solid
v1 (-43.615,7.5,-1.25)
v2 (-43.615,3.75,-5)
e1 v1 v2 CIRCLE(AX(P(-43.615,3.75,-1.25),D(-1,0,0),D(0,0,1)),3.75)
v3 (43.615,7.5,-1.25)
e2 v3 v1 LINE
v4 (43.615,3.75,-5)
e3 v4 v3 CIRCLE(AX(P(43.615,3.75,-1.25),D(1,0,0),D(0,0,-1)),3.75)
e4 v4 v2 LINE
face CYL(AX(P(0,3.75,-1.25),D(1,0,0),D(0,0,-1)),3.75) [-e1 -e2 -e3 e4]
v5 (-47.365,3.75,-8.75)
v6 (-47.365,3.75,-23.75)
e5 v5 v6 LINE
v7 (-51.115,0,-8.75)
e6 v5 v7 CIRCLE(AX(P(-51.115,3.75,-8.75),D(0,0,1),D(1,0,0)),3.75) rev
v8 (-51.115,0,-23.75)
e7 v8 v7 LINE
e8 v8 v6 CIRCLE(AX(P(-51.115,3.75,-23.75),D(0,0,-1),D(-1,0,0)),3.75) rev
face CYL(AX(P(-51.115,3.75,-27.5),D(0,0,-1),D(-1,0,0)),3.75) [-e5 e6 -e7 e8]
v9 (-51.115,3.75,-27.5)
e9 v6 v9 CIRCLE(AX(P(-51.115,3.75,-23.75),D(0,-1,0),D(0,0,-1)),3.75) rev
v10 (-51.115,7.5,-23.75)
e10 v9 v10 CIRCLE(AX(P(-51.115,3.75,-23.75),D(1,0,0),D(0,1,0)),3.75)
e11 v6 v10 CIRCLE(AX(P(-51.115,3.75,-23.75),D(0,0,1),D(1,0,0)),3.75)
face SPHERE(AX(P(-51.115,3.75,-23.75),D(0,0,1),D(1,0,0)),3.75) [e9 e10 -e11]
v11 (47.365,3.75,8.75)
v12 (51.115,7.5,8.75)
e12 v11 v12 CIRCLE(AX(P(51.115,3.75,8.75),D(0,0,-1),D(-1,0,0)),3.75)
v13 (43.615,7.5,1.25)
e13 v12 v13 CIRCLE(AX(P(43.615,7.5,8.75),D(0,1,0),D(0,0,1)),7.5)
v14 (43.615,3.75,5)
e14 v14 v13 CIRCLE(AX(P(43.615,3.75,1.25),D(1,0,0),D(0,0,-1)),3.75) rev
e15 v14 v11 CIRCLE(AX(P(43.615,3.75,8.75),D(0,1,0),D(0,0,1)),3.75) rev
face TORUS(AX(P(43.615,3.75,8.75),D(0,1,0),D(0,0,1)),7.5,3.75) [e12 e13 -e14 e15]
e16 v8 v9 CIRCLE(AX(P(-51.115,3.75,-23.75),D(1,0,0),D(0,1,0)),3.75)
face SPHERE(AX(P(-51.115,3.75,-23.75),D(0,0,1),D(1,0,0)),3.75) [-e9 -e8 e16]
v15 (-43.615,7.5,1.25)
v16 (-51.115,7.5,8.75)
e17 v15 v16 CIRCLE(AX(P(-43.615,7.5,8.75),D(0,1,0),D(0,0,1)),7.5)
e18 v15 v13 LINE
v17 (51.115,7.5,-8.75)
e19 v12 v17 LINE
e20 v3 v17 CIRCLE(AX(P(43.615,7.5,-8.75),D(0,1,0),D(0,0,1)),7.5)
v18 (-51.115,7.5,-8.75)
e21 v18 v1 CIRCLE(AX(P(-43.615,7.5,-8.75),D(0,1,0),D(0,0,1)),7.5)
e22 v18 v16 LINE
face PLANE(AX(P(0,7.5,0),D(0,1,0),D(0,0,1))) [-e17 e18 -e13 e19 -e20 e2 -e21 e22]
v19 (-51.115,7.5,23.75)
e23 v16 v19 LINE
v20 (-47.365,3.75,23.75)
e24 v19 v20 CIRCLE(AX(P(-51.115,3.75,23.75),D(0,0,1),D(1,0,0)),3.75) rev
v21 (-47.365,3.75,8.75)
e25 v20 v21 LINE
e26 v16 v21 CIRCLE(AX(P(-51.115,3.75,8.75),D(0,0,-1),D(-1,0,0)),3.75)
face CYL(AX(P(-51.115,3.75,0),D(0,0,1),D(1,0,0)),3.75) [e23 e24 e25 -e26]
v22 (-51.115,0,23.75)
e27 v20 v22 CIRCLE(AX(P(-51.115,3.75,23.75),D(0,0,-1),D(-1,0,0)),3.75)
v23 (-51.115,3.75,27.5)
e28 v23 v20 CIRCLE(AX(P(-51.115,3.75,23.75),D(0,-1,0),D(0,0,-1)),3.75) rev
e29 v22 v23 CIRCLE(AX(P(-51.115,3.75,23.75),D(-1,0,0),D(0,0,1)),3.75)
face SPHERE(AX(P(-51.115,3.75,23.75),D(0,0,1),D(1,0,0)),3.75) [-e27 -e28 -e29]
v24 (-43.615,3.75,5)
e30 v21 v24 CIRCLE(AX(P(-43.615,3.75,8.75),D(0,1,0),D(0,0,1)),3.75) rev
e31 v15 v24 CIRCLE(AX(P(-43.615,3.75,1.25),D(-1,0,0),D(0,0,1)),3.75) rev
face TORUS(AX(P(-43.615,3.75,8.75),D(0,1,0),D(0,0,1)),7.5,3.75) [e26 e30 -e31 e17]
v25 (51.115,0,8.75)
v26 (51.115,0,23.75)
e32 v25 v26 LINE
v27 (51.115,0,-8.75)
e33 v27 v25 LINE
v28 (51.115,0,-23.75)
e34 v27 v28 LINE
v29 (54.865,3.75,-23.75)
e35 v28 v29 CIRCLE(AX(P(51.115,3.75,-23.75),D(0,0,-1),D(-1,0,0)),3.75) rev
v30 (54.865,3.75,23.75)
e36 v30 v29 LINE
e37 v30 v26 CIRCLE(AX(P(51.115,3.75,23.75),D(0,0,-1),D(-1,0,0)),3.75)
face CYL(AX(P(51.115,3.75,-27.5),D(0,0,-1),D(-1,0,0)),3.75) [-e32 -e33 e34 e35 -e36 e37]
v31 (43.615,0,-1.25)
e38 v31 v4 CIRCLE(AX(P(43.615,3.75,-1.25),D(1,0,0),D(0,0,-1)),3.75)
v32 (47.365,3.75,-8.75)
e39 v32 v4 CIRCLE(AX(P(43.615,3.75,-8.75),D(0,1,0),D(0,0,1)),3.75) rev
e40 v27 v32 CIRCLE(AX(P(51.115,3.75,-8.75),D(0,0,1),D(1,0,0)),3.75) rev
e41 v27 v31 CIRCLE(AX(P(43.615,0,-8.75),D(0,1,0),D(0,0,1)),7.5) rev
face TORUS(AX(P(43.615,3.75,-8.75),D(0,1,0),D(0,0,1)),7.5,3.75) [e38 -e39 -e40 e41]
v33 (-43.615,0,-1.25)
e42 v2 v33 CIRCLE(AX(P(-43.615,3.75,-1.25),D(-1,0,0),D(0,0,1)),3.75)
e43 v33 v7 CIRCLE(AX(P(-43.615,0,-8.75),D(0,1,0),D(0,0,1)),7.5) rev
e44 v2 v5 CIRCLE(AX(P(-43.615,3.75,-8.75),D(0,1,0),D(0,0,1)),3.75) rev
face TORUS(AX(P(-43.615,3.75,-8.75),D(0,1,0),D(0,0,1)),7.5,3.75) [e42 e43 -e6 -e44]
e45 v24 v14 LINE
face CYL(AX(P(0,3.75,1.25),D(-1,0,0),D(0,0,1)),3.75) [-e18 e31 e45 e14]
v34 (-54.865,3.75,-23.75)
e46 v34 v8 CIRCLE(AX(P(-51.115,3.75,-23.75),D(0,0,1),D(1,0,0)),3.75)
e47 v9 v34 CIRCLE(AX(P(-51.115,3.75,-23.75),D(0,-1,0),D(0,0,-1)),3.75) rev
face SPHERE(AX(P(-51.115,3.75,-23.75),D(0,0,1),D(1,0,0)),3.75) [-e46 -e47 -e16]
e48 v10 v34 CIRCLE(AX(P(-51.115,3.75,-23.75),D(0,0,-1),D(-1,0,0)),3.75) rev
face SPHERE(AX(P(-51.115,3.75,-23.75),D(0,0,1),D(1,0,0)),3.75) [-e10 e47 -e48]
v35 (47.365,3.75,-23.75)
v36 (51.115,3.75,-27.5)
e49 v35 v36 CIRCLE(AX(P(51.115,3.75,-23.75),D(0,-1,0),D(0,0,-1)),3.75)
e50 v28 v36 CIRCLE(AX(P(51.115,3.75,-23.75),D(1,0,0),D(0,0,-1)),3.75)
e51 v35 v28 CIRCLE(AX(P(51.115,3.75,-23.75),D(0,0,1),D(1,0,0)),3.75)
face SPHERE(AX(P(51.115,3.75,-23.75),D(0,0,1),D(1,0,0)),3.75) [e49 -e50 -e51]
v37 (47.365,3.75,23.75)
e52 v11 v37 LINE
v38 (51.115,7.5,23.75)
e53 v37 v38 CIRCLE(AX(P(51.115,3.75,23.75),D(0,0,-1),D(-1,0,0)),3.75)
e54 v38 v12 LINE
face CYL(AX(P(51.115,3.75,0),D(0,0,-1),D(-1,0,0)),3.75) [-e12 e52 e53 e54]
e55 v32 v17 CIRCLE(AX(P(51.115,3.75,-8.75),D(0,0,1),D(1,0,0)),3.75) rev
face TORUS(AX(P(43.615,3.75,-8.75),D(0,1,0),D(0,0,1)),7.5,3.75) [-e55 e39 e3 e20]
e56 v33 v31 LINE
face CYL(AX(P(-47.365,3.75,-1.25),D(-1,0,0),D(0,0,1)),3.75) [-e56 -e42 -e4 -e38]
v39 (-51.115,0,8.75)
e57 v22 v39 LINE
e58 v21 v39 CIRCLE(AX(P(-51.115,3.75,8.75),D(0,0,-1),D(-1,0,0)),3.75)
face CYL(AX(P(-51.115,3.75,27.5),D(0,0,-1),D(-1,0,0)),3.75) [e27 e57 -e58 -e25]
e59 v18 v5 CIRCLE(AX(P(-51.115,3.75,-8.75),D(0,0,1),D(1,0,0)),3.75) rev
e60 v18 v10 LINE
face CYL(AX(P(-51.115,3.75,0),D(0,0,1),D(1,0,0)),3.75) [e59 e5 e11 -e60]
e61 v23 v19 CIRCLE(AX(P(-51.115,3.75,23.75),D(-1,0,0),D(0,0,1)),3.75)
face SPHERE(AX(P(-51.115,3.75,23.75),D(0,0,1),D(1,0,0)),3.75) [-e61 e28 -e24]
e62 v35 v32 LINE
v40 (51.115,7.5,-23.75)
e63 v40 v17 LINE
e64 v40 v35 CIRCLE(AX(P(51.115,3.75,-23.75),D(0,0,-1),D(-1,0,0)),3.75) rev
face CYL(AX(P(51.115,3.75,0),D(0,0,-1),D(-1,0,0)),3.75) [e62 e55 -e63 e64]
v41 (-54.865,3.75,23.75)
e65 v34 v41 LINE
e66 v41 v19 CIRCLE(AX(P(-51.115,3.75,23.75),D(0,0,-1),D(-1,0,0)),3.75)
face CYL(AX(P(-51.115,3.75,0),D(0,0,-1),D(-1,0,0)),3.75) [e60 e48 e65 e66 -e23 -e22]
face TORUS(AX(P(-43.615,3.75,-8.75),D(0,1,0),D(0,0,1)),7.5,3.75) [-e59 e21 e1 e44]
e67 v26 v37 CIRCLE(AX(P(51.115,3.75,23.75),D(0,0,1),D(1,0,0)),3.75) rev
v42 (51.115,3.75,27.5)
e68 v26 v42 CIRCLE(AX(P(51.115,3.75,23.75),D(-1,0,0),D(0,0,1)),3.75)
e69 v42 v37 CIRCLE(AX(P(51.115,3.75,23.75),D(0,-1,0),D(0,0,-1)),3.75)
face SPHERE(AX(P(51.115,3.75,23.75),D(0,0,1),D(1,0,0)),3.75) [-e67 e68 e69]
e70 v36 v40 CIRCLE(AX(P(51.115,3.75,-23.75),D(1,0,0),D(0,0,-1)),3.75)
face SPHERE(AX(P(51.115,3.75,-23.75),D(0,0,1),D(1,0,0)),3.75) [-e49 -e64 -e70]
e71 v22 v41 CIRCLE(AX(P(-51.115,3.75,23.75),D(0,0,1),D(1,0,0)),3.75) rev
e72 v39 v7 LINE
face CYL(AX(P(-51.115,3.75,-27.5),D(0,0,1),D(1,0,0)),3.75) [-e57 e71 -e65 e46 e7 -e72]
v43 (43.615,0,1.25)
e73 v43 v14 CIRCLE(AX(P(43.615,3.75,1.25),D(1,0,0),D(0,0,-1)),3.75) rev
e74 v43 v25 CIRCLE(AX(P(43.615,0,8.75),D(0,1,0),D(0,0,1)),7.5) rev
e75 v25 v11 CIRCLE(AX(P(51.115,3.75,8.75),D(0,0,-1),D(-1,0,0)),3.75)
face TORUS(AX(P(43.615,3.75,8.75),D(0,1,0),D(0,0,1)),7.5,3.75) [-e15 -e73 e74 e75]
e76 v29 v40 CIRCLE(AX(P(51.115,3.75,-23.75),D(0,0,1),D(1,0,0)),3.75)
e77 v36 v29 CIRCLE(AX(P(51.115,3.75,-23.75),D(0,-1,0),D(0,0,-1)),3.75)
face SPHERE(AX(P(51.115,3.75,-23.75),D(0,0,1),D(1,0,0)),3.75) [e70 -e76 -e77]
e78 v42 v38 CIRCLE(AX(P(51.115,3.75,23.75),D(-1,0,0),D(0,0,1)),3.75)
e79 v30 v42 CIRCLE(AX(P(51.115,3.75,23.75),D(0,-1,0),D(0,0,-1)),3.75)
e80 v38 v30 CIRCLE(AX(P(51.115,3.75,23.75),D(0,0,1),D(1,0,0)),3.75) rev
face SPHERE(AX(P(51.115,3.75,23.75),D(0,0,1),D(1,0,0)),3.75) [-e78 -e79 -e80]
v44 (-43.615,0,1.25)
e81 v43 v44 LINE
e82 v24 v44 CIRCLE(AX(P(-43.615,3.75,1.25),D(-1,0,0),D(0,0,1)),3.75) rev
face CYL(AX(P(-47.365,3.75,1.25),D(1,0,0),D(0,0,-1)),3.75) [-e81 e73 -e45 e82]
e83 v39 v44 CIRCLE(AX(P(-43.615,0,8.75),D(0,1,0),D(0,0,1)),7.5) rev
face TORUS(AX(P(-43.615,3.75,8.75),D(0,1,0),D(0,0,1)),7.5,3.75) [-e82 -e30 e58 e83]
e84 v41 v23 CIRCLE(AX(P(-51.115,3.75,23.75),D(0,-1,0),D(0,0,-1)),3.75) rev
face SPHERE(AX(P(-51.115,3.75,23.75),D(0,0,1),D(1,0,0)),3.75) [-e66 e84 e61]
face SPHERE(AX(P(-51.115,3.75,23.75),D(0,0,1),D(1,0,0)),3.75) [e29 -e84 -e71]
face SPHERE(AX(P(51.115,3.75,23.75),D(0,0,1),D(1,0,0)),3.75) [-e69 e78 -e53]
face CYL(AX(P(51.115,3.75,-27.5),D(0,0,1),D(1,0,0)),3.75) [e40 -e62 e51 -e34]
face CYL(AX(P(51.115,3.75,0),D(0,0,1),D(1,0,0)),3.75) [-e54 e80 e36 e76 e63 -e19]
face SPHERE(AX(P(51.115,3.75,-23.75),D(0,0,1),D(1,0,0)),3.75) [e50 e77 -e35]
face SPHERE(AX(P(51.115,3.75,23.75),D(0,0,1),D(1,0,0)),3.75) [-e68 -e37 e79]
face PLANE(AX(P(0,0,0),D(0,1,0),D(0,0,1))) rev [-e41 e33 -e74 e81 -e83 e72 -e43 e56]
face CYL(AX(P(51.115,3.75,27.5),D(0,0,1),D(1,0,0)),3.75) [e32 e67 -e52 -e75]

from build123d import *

# Parameters (mm, degrees)
BOSS_EXTRUDE1_DEPTH = 7.5
FILLET1_R           = 3.75
FILLET2_R           = 3.75


# Some blends are built 0.0001 mm under size
with BuildPart() as part:
    # Sketch2 → Boss-Extrude1 (new body)
    with BuildSketch(Plane(origin=(0, 0, 0), x_dir=(1, 0, 0), z_dir=(0, 1, 0))):
        Polygon((-54.865, 27.5), (-54.865, -27.5), (-47.365, -27.5), (-47.365, -5), (47.365, -5), (47.365, -27.5), (54.865, -27.5), (54.865, 27.5), (47.365, 27.5), (47.365, 5), (-47.365, 5), (-47.365, 27.5), align=None)
    extrude(amount=BOSS_EXTRUDE1_DEPTH)

    # Fillet1
    fillet1_edges = [part.edges().sort_by_distance(p)[0] for p in [
        (0, 7.5, 5),
        (-54.865, 0, 0),
        (-47.365, 0, -16.25),
        (0, 0, -5),
        (47.365, 0, -16.25),
        (47.365, 7.5, 16.25),
        (54.865, 0, 0),
        (47.365, 0, 16.25),
        (0, 0, 5),
        (-47.365, 0, 16.25),
        (54.865, 7.5, 0),
        (-54.865, 3.75, 27.5),
        (-54.865, 3.75, -27.5),
        (-47.365, 3.75, -27.5),
        (-47.365, 3.75, -5),
        (47.365, 3.75, -5),
        (47.365, 3.75, -27.5),
        (54.865, 3.75, -27.5),
        (54.865, 3.75, 27.5),
        (47.365, 3.75, 27.5),
        (47.365, 3.75, 5),
        (-47.365, 3.75, 5),
        (-47.365, 3.75, 27.5),
        (47.365, 7.5, -16.25),
        (0, 7.5, -5),
        (-47.365, 7.5, -16.25),
        (-54.865, 7.5, 0),
        (-47.365, 7.5, 16.25),
    ]]
    fillet(fillet1_edges, radius=FILLET1_R - 0.0001)  # a hair under: the kernel refuses the full size

    # Fillet2
    # the kernel refuses this fillet: 3.75 mm, written as the material it takes off along each edge
    with BuildSketch(Plane(origin=(-47.365, 3.75, -23.75), x_dir=(0, 0, -1), z_dir=(0, -1, 0))) as fillet2_piece_1:
        with BuildLine():
            CenterArc((0.0001, -3.7499), 3.7499, 0, 90)
            Line((3.75, -3.7499), (3.75, 0))
            Line((3.75, 0), (0.0001, 0))
        make_face()
    revolve(axis=Axis((-47.365, 3.75, -23.75), (1, 0, 0)), revolution_arc=90, mode=Mode.SUBTRACT)
    with BuildSketch(Plane(origin=(-47.365, 3.75, -23.75), x_dir=(0, -1, 0), z_dir=(0, 0, 1))) as fillet2_piece_2:
        with BuildLine():
            CenterArc((0.0001, -3.7499), 3.7499, 0, 90)
            Line((3.75, -3.7499), (3.75, 0))
            Line((3.75, 0), (0.0001, 0))
        make_face()
    revolve(axis=Axis((-47.365, 3.75, -23.75), (1, 0, 0)), revolution_arc=90, mode=Mode.SUBTRACT)
    with BuildSketch(Plane(origin=(-54.865, 3.75, 23.75), x_dir=(0, 0, 1), z_dir=(0, -1, 0))) as fillet2_piece_3:
        with BuildLine():
            CenterArc((0.0001, -3.7499), 3.7499, 0, 90)
            Line((3.75, -3.7499), (3.75, 0))
            Line((3.75, 0), (0.0001, 0))
        make_face()
    revolve(axis=Axis((-54.865, 3.75, 23.75), (-1, 0, 0)), revolution_arc=90, mode=Mode.SUBTRACT)
    with BuildSketch(Plane(origin=(-54.865, 3.75, 23.75), x_dir=(0, -1, 0), z_dir=(0, 0, -1))) as fillet2_piece_4:
        with BuildLine():
            CenterArc((0.0001, -3.7499), 3.7499, 0, 90)
            Line((3.75, -3.7499), (3.75, 0))
            Line((3.75, 0), (0.0001, 0))
        make_face()
    revolve(axis=Axis((-54.865, 3.75, 23.75), (-1, 0, 0)), revolution_arc=90, mode=Mode.SUBTRACT)
    with BuildSketch(Plane(origin=(47.365, 3.75, 23.75), x_dir=(0, -1, 0), z_dir=(0, 0, -1))) as fillet2_piece_5:
        with BuildLine():
            CenterArc((0.0001, -3.7499), 3.7499, 0, 90)
            Line((3.75, -3.7499), (3.75, 0))
            Line((3.75, 0), (0.0001, 0))
        make_face()
    revolve(axis=Axis((47.365, 3.75, 23.75), (-1, 0, 0)), revolution_arc=90, mode=Mode.SUBTRACT)
    with BuildSketch(Plane(origin=(47.365, 3.75, 23.75), x_dir=(0, 0, 1), z_dir=(0, -1, 0))) as fillet2_piece_6:
        with BuildLine():
            CenterArc((0.0001, -3.7499), 3.7499, 0, 90)
            Line((3.75, -3.7499), (3.75, 0))
            Line((3.75, 0), (0.0001, 0))
        make_face()
    revolve(axis=Axis((47.365, 3.75, 23.75), (-1, 0, 0)), revolution_arc=90, mode=Mode.SUBTRACT)
    with BuildSketch(Plane(origin=(54.865, 3.75, -23.75), x_dir=(0, -1, 0), z_dir=(0, 0, 1))) as fillet2_piece_7:
        with BuildLine():
            CenterArc((0.0001, -3.7499), 3.7499, 0, 90)
            Line((3.75, -3.7499), (3.75, 0))
            Line((3.75, 0), (0.0001, 0))
        make_face()
    revolve(axis=Axis((54.865, 3.75, -23.75), (1, 0, 0)), revolution_arc=90, mode=Mode.SUBTRACT)
    with BuildSketch(Plane(origin=(54.865, 3.75, -23.75), x_dir=(0, 0, -1), z_dir=(0, -1, 0))) as fillet2_piece_8:
        with BuildLine():
            CenterArc((0.0001, -3.7499), 3.7499, 0, 90)
            Line((3.75, -3.7499), (3.75, 0))
            Line((3.75, 0), (0.0001, 0))
        make_face()
    revolve(axis=Axis((54.865, 3.75, -23.75), (1, 0, 0)), revolution_arc=90, mode=Mode.SUBTRACT)
    with BuildSketch(Plane(origin=(-54.865, 3.75, -23.75), x_dir=(0, 1, 0), z_dir=(0, 0, 1))) as fillet2_piece_9:
        with BuildLine():
            CenterArc((0.0001, -3.7499), 3.7499, 0, 90)
            Line((3.75, -3.7499), (3.75, 0))
            Line((3.75, 0), (0.0001, 0))
        make_face()
    revolve(axis=Axis((-54.865, 3.75, -23.75), (-1, 0, 0)), revolution_arc=90, mode=Mode.SUBTRACT)
    with BuildSketch(Plane(origin=(-54.865, 3.75, -23.75), x_dir=(0, 0, -1), z_dir=(0, 1, 0))) as fillet2_piece_10:
        with BuildLine():
            CenterArc((0.0001, -3.7499), 3.7499, 0, 90)
            Line((3.75, -3.7499), (3.75, 0))
            Line((3.75, 0), (0.0001, 0))
        make_face()
    revolve(axis=Axis((-54.865, 3.75, -23.75), (-1, 0, 0)), revolution_arc=90, mode=Mode.SUBTRACT)
    with BuildSketch(Plane(origin=(-47.365, 3.75, 23.75), x_dir=(0, 1, 0), z_dir=(0, 0, -1))) as fillet2_piece_11:
        with BuildLine():
            CenterArc((0.0001, -3.7499), 3.7499, 0, 90)
            Line((3.75, -3.7499), (3.75, 0))
            Line((3.75, 0), (0.0001, 0))
        make_face()
    revolve(axis=Axis((-47.365, 3.75, 23.75), (1, 0, 0)), revolution_arc=90, mode=Mode.SUBTRACT)
    with BuildSketch(Plane(origin=(-47.365, 3.75, 23.75), x_dir=(0, 0, 1), z_dir=(0, 1, 0))) as fillet2_piece_12:
        with BuildLine():
            CenterArc((0.0001, -3.7499), 3.7499, 0, 90)
            Line((3.75, -3.7499), (3.75, 0))
            Line((3.75, 0), (0.0001, 0))
        make_face()
    revolve(axis=Axis((-47.365, 3.75, 23.75), (1, 0, 0)), revolution_arc=90, mode=Mode.SUBTRACT)
    with BuildSketch(Plane(origin=(54.865, 3.75, 23.75), x_dir=(0, 0, 1), z_dir=(0, 1, 0))) as fillet2_piece_13:
        with BuildLine():
            CenterArc((0.0001, -3.7499), 3.7499, 0, 90)
            Line((3.75, -3.7499), (3.75, 0))
            Line((3.75, 0), (0.0001, 0))
        make_face()
    revolve(axis=Axis((54.865, 3.75, 23.75), (1, 0, 0)), revolution_arc=90, mode=Mode.SUBTRACT)
    with BuildSketch(Plane(origin=(54.865, 3.75, 23.75), x_dir=(0, 1, 0), z_dir=(0, 0, -1))) as fillet2_piece_14:
        with BuildLine():
            CenterArc((0.0001, -3.7499), 3.7499, 0, 90)
            Line((3.75, -3.7499), (3.75, 0))
            Line((3.75, 0), (0.0001, 0))
        make_face()
    revolve(axis=Axis((54.865, 3.75, 23.75), (1, 0, 0)), revolution_arc=90, mode=Mode.SUBTRACT)
    with BuildSketch(Plane(origin=(47.365, 3.75, -23.75), x_dir=(0, 0, -1), z_dir=(0, 1, 0))) as fillet2_piece_15:
        with BuildLine():
            CenterArc((0.0001, -3.7499), 3.7499, 0, 90)
            Line((3.75, -3.7499), (3.75, 0))
            Line((3.75, 0), (0.0001, 0))
        make_face()
    revolve(axis=Axis((47.365, 3.75, -23.75), (-1, 0, 0)), revolution_arc=90, mode=Mode.SUBTRACT)
    with BuildSketch(Plane(origin=(47.365, 3.75, -23.75), x_dir=(0, 1, 0), z_dir=(0, 0, 1))) as fillet2_piece_16:
        with BuildLine():
            CenterArc((0.0001, -3.7499), 3.7499, 0, 90)
            Line((3.75, -3.7499), (3.75, 0))
            Line((3.75, 0), (0.0001, 0))
        make_face()
    revolve(axis=Axis((47.365, 3.75, -23.75), (-1, 0, 0)), revolution_arc=90, mode=Mode.SUBTRACT)
    with BuildSketch(Plane(origin=(54.865, 7.5, -27.5), x_dir=(0, 0, 1), z_dir=(-1, 0, 0)), Plane(origin=(47.365, 7.5, 27.5), x_dir=(0, 0, -1), z_dir=(1, 0, 0))) as fillet2_piece_17:
        with BuildLine():
            CenterArc((FILLET2_R, -FILLET2_R), FILLET2_R, 90, 90)
            Line((0, -FILLET2_R), (0, 0))
            Line((0, 0), (FILLET2_R, 0))
        make_face()
    extrude(amount=7.5, mode=Mode.SUBTRACT)
    with BuildSketch(Plane(origin=(54.865, 0, -27.5), x_dir=(0, 0, 1), z_dir=(-1, 0, 0)), Plane(origin=(47.365, 0, 27.5), x_dir=(0, 0, -1), z_dir=(1, 0, 0)), Plane(origin=(-54.865, 0, 27.5), x_dir=(0, 0, -1), z_dir=(1, 0, 0)), Plane(origin=(-54.865, 7.5, 27.5), x_dir=(0, -1, 0), z_dir=(1, 0, 0)), Plane(origin=(-47.365, 0, -27.5), x_dir=(0, 0, 1), z_dir=(-1, 0, 0)), Plane(origin=(-47.365, 7.5, -27.5), x_dir=(0, -1, 0), z_dir=(-1, 0, 0))) as fillet2_piece_18:
        with BuildLine():
            CenterArc((FILLET2_R, FILLET2_R), FILLET2_R, 180, 90)
            Line((0, FILLET2_R), (0, 0))
            Line((0, 0), (FILLET2_R, 0))
        make_face()
    extrude(amount=7.5, mode=Mode.SUBTRACT)


solid = part.part
